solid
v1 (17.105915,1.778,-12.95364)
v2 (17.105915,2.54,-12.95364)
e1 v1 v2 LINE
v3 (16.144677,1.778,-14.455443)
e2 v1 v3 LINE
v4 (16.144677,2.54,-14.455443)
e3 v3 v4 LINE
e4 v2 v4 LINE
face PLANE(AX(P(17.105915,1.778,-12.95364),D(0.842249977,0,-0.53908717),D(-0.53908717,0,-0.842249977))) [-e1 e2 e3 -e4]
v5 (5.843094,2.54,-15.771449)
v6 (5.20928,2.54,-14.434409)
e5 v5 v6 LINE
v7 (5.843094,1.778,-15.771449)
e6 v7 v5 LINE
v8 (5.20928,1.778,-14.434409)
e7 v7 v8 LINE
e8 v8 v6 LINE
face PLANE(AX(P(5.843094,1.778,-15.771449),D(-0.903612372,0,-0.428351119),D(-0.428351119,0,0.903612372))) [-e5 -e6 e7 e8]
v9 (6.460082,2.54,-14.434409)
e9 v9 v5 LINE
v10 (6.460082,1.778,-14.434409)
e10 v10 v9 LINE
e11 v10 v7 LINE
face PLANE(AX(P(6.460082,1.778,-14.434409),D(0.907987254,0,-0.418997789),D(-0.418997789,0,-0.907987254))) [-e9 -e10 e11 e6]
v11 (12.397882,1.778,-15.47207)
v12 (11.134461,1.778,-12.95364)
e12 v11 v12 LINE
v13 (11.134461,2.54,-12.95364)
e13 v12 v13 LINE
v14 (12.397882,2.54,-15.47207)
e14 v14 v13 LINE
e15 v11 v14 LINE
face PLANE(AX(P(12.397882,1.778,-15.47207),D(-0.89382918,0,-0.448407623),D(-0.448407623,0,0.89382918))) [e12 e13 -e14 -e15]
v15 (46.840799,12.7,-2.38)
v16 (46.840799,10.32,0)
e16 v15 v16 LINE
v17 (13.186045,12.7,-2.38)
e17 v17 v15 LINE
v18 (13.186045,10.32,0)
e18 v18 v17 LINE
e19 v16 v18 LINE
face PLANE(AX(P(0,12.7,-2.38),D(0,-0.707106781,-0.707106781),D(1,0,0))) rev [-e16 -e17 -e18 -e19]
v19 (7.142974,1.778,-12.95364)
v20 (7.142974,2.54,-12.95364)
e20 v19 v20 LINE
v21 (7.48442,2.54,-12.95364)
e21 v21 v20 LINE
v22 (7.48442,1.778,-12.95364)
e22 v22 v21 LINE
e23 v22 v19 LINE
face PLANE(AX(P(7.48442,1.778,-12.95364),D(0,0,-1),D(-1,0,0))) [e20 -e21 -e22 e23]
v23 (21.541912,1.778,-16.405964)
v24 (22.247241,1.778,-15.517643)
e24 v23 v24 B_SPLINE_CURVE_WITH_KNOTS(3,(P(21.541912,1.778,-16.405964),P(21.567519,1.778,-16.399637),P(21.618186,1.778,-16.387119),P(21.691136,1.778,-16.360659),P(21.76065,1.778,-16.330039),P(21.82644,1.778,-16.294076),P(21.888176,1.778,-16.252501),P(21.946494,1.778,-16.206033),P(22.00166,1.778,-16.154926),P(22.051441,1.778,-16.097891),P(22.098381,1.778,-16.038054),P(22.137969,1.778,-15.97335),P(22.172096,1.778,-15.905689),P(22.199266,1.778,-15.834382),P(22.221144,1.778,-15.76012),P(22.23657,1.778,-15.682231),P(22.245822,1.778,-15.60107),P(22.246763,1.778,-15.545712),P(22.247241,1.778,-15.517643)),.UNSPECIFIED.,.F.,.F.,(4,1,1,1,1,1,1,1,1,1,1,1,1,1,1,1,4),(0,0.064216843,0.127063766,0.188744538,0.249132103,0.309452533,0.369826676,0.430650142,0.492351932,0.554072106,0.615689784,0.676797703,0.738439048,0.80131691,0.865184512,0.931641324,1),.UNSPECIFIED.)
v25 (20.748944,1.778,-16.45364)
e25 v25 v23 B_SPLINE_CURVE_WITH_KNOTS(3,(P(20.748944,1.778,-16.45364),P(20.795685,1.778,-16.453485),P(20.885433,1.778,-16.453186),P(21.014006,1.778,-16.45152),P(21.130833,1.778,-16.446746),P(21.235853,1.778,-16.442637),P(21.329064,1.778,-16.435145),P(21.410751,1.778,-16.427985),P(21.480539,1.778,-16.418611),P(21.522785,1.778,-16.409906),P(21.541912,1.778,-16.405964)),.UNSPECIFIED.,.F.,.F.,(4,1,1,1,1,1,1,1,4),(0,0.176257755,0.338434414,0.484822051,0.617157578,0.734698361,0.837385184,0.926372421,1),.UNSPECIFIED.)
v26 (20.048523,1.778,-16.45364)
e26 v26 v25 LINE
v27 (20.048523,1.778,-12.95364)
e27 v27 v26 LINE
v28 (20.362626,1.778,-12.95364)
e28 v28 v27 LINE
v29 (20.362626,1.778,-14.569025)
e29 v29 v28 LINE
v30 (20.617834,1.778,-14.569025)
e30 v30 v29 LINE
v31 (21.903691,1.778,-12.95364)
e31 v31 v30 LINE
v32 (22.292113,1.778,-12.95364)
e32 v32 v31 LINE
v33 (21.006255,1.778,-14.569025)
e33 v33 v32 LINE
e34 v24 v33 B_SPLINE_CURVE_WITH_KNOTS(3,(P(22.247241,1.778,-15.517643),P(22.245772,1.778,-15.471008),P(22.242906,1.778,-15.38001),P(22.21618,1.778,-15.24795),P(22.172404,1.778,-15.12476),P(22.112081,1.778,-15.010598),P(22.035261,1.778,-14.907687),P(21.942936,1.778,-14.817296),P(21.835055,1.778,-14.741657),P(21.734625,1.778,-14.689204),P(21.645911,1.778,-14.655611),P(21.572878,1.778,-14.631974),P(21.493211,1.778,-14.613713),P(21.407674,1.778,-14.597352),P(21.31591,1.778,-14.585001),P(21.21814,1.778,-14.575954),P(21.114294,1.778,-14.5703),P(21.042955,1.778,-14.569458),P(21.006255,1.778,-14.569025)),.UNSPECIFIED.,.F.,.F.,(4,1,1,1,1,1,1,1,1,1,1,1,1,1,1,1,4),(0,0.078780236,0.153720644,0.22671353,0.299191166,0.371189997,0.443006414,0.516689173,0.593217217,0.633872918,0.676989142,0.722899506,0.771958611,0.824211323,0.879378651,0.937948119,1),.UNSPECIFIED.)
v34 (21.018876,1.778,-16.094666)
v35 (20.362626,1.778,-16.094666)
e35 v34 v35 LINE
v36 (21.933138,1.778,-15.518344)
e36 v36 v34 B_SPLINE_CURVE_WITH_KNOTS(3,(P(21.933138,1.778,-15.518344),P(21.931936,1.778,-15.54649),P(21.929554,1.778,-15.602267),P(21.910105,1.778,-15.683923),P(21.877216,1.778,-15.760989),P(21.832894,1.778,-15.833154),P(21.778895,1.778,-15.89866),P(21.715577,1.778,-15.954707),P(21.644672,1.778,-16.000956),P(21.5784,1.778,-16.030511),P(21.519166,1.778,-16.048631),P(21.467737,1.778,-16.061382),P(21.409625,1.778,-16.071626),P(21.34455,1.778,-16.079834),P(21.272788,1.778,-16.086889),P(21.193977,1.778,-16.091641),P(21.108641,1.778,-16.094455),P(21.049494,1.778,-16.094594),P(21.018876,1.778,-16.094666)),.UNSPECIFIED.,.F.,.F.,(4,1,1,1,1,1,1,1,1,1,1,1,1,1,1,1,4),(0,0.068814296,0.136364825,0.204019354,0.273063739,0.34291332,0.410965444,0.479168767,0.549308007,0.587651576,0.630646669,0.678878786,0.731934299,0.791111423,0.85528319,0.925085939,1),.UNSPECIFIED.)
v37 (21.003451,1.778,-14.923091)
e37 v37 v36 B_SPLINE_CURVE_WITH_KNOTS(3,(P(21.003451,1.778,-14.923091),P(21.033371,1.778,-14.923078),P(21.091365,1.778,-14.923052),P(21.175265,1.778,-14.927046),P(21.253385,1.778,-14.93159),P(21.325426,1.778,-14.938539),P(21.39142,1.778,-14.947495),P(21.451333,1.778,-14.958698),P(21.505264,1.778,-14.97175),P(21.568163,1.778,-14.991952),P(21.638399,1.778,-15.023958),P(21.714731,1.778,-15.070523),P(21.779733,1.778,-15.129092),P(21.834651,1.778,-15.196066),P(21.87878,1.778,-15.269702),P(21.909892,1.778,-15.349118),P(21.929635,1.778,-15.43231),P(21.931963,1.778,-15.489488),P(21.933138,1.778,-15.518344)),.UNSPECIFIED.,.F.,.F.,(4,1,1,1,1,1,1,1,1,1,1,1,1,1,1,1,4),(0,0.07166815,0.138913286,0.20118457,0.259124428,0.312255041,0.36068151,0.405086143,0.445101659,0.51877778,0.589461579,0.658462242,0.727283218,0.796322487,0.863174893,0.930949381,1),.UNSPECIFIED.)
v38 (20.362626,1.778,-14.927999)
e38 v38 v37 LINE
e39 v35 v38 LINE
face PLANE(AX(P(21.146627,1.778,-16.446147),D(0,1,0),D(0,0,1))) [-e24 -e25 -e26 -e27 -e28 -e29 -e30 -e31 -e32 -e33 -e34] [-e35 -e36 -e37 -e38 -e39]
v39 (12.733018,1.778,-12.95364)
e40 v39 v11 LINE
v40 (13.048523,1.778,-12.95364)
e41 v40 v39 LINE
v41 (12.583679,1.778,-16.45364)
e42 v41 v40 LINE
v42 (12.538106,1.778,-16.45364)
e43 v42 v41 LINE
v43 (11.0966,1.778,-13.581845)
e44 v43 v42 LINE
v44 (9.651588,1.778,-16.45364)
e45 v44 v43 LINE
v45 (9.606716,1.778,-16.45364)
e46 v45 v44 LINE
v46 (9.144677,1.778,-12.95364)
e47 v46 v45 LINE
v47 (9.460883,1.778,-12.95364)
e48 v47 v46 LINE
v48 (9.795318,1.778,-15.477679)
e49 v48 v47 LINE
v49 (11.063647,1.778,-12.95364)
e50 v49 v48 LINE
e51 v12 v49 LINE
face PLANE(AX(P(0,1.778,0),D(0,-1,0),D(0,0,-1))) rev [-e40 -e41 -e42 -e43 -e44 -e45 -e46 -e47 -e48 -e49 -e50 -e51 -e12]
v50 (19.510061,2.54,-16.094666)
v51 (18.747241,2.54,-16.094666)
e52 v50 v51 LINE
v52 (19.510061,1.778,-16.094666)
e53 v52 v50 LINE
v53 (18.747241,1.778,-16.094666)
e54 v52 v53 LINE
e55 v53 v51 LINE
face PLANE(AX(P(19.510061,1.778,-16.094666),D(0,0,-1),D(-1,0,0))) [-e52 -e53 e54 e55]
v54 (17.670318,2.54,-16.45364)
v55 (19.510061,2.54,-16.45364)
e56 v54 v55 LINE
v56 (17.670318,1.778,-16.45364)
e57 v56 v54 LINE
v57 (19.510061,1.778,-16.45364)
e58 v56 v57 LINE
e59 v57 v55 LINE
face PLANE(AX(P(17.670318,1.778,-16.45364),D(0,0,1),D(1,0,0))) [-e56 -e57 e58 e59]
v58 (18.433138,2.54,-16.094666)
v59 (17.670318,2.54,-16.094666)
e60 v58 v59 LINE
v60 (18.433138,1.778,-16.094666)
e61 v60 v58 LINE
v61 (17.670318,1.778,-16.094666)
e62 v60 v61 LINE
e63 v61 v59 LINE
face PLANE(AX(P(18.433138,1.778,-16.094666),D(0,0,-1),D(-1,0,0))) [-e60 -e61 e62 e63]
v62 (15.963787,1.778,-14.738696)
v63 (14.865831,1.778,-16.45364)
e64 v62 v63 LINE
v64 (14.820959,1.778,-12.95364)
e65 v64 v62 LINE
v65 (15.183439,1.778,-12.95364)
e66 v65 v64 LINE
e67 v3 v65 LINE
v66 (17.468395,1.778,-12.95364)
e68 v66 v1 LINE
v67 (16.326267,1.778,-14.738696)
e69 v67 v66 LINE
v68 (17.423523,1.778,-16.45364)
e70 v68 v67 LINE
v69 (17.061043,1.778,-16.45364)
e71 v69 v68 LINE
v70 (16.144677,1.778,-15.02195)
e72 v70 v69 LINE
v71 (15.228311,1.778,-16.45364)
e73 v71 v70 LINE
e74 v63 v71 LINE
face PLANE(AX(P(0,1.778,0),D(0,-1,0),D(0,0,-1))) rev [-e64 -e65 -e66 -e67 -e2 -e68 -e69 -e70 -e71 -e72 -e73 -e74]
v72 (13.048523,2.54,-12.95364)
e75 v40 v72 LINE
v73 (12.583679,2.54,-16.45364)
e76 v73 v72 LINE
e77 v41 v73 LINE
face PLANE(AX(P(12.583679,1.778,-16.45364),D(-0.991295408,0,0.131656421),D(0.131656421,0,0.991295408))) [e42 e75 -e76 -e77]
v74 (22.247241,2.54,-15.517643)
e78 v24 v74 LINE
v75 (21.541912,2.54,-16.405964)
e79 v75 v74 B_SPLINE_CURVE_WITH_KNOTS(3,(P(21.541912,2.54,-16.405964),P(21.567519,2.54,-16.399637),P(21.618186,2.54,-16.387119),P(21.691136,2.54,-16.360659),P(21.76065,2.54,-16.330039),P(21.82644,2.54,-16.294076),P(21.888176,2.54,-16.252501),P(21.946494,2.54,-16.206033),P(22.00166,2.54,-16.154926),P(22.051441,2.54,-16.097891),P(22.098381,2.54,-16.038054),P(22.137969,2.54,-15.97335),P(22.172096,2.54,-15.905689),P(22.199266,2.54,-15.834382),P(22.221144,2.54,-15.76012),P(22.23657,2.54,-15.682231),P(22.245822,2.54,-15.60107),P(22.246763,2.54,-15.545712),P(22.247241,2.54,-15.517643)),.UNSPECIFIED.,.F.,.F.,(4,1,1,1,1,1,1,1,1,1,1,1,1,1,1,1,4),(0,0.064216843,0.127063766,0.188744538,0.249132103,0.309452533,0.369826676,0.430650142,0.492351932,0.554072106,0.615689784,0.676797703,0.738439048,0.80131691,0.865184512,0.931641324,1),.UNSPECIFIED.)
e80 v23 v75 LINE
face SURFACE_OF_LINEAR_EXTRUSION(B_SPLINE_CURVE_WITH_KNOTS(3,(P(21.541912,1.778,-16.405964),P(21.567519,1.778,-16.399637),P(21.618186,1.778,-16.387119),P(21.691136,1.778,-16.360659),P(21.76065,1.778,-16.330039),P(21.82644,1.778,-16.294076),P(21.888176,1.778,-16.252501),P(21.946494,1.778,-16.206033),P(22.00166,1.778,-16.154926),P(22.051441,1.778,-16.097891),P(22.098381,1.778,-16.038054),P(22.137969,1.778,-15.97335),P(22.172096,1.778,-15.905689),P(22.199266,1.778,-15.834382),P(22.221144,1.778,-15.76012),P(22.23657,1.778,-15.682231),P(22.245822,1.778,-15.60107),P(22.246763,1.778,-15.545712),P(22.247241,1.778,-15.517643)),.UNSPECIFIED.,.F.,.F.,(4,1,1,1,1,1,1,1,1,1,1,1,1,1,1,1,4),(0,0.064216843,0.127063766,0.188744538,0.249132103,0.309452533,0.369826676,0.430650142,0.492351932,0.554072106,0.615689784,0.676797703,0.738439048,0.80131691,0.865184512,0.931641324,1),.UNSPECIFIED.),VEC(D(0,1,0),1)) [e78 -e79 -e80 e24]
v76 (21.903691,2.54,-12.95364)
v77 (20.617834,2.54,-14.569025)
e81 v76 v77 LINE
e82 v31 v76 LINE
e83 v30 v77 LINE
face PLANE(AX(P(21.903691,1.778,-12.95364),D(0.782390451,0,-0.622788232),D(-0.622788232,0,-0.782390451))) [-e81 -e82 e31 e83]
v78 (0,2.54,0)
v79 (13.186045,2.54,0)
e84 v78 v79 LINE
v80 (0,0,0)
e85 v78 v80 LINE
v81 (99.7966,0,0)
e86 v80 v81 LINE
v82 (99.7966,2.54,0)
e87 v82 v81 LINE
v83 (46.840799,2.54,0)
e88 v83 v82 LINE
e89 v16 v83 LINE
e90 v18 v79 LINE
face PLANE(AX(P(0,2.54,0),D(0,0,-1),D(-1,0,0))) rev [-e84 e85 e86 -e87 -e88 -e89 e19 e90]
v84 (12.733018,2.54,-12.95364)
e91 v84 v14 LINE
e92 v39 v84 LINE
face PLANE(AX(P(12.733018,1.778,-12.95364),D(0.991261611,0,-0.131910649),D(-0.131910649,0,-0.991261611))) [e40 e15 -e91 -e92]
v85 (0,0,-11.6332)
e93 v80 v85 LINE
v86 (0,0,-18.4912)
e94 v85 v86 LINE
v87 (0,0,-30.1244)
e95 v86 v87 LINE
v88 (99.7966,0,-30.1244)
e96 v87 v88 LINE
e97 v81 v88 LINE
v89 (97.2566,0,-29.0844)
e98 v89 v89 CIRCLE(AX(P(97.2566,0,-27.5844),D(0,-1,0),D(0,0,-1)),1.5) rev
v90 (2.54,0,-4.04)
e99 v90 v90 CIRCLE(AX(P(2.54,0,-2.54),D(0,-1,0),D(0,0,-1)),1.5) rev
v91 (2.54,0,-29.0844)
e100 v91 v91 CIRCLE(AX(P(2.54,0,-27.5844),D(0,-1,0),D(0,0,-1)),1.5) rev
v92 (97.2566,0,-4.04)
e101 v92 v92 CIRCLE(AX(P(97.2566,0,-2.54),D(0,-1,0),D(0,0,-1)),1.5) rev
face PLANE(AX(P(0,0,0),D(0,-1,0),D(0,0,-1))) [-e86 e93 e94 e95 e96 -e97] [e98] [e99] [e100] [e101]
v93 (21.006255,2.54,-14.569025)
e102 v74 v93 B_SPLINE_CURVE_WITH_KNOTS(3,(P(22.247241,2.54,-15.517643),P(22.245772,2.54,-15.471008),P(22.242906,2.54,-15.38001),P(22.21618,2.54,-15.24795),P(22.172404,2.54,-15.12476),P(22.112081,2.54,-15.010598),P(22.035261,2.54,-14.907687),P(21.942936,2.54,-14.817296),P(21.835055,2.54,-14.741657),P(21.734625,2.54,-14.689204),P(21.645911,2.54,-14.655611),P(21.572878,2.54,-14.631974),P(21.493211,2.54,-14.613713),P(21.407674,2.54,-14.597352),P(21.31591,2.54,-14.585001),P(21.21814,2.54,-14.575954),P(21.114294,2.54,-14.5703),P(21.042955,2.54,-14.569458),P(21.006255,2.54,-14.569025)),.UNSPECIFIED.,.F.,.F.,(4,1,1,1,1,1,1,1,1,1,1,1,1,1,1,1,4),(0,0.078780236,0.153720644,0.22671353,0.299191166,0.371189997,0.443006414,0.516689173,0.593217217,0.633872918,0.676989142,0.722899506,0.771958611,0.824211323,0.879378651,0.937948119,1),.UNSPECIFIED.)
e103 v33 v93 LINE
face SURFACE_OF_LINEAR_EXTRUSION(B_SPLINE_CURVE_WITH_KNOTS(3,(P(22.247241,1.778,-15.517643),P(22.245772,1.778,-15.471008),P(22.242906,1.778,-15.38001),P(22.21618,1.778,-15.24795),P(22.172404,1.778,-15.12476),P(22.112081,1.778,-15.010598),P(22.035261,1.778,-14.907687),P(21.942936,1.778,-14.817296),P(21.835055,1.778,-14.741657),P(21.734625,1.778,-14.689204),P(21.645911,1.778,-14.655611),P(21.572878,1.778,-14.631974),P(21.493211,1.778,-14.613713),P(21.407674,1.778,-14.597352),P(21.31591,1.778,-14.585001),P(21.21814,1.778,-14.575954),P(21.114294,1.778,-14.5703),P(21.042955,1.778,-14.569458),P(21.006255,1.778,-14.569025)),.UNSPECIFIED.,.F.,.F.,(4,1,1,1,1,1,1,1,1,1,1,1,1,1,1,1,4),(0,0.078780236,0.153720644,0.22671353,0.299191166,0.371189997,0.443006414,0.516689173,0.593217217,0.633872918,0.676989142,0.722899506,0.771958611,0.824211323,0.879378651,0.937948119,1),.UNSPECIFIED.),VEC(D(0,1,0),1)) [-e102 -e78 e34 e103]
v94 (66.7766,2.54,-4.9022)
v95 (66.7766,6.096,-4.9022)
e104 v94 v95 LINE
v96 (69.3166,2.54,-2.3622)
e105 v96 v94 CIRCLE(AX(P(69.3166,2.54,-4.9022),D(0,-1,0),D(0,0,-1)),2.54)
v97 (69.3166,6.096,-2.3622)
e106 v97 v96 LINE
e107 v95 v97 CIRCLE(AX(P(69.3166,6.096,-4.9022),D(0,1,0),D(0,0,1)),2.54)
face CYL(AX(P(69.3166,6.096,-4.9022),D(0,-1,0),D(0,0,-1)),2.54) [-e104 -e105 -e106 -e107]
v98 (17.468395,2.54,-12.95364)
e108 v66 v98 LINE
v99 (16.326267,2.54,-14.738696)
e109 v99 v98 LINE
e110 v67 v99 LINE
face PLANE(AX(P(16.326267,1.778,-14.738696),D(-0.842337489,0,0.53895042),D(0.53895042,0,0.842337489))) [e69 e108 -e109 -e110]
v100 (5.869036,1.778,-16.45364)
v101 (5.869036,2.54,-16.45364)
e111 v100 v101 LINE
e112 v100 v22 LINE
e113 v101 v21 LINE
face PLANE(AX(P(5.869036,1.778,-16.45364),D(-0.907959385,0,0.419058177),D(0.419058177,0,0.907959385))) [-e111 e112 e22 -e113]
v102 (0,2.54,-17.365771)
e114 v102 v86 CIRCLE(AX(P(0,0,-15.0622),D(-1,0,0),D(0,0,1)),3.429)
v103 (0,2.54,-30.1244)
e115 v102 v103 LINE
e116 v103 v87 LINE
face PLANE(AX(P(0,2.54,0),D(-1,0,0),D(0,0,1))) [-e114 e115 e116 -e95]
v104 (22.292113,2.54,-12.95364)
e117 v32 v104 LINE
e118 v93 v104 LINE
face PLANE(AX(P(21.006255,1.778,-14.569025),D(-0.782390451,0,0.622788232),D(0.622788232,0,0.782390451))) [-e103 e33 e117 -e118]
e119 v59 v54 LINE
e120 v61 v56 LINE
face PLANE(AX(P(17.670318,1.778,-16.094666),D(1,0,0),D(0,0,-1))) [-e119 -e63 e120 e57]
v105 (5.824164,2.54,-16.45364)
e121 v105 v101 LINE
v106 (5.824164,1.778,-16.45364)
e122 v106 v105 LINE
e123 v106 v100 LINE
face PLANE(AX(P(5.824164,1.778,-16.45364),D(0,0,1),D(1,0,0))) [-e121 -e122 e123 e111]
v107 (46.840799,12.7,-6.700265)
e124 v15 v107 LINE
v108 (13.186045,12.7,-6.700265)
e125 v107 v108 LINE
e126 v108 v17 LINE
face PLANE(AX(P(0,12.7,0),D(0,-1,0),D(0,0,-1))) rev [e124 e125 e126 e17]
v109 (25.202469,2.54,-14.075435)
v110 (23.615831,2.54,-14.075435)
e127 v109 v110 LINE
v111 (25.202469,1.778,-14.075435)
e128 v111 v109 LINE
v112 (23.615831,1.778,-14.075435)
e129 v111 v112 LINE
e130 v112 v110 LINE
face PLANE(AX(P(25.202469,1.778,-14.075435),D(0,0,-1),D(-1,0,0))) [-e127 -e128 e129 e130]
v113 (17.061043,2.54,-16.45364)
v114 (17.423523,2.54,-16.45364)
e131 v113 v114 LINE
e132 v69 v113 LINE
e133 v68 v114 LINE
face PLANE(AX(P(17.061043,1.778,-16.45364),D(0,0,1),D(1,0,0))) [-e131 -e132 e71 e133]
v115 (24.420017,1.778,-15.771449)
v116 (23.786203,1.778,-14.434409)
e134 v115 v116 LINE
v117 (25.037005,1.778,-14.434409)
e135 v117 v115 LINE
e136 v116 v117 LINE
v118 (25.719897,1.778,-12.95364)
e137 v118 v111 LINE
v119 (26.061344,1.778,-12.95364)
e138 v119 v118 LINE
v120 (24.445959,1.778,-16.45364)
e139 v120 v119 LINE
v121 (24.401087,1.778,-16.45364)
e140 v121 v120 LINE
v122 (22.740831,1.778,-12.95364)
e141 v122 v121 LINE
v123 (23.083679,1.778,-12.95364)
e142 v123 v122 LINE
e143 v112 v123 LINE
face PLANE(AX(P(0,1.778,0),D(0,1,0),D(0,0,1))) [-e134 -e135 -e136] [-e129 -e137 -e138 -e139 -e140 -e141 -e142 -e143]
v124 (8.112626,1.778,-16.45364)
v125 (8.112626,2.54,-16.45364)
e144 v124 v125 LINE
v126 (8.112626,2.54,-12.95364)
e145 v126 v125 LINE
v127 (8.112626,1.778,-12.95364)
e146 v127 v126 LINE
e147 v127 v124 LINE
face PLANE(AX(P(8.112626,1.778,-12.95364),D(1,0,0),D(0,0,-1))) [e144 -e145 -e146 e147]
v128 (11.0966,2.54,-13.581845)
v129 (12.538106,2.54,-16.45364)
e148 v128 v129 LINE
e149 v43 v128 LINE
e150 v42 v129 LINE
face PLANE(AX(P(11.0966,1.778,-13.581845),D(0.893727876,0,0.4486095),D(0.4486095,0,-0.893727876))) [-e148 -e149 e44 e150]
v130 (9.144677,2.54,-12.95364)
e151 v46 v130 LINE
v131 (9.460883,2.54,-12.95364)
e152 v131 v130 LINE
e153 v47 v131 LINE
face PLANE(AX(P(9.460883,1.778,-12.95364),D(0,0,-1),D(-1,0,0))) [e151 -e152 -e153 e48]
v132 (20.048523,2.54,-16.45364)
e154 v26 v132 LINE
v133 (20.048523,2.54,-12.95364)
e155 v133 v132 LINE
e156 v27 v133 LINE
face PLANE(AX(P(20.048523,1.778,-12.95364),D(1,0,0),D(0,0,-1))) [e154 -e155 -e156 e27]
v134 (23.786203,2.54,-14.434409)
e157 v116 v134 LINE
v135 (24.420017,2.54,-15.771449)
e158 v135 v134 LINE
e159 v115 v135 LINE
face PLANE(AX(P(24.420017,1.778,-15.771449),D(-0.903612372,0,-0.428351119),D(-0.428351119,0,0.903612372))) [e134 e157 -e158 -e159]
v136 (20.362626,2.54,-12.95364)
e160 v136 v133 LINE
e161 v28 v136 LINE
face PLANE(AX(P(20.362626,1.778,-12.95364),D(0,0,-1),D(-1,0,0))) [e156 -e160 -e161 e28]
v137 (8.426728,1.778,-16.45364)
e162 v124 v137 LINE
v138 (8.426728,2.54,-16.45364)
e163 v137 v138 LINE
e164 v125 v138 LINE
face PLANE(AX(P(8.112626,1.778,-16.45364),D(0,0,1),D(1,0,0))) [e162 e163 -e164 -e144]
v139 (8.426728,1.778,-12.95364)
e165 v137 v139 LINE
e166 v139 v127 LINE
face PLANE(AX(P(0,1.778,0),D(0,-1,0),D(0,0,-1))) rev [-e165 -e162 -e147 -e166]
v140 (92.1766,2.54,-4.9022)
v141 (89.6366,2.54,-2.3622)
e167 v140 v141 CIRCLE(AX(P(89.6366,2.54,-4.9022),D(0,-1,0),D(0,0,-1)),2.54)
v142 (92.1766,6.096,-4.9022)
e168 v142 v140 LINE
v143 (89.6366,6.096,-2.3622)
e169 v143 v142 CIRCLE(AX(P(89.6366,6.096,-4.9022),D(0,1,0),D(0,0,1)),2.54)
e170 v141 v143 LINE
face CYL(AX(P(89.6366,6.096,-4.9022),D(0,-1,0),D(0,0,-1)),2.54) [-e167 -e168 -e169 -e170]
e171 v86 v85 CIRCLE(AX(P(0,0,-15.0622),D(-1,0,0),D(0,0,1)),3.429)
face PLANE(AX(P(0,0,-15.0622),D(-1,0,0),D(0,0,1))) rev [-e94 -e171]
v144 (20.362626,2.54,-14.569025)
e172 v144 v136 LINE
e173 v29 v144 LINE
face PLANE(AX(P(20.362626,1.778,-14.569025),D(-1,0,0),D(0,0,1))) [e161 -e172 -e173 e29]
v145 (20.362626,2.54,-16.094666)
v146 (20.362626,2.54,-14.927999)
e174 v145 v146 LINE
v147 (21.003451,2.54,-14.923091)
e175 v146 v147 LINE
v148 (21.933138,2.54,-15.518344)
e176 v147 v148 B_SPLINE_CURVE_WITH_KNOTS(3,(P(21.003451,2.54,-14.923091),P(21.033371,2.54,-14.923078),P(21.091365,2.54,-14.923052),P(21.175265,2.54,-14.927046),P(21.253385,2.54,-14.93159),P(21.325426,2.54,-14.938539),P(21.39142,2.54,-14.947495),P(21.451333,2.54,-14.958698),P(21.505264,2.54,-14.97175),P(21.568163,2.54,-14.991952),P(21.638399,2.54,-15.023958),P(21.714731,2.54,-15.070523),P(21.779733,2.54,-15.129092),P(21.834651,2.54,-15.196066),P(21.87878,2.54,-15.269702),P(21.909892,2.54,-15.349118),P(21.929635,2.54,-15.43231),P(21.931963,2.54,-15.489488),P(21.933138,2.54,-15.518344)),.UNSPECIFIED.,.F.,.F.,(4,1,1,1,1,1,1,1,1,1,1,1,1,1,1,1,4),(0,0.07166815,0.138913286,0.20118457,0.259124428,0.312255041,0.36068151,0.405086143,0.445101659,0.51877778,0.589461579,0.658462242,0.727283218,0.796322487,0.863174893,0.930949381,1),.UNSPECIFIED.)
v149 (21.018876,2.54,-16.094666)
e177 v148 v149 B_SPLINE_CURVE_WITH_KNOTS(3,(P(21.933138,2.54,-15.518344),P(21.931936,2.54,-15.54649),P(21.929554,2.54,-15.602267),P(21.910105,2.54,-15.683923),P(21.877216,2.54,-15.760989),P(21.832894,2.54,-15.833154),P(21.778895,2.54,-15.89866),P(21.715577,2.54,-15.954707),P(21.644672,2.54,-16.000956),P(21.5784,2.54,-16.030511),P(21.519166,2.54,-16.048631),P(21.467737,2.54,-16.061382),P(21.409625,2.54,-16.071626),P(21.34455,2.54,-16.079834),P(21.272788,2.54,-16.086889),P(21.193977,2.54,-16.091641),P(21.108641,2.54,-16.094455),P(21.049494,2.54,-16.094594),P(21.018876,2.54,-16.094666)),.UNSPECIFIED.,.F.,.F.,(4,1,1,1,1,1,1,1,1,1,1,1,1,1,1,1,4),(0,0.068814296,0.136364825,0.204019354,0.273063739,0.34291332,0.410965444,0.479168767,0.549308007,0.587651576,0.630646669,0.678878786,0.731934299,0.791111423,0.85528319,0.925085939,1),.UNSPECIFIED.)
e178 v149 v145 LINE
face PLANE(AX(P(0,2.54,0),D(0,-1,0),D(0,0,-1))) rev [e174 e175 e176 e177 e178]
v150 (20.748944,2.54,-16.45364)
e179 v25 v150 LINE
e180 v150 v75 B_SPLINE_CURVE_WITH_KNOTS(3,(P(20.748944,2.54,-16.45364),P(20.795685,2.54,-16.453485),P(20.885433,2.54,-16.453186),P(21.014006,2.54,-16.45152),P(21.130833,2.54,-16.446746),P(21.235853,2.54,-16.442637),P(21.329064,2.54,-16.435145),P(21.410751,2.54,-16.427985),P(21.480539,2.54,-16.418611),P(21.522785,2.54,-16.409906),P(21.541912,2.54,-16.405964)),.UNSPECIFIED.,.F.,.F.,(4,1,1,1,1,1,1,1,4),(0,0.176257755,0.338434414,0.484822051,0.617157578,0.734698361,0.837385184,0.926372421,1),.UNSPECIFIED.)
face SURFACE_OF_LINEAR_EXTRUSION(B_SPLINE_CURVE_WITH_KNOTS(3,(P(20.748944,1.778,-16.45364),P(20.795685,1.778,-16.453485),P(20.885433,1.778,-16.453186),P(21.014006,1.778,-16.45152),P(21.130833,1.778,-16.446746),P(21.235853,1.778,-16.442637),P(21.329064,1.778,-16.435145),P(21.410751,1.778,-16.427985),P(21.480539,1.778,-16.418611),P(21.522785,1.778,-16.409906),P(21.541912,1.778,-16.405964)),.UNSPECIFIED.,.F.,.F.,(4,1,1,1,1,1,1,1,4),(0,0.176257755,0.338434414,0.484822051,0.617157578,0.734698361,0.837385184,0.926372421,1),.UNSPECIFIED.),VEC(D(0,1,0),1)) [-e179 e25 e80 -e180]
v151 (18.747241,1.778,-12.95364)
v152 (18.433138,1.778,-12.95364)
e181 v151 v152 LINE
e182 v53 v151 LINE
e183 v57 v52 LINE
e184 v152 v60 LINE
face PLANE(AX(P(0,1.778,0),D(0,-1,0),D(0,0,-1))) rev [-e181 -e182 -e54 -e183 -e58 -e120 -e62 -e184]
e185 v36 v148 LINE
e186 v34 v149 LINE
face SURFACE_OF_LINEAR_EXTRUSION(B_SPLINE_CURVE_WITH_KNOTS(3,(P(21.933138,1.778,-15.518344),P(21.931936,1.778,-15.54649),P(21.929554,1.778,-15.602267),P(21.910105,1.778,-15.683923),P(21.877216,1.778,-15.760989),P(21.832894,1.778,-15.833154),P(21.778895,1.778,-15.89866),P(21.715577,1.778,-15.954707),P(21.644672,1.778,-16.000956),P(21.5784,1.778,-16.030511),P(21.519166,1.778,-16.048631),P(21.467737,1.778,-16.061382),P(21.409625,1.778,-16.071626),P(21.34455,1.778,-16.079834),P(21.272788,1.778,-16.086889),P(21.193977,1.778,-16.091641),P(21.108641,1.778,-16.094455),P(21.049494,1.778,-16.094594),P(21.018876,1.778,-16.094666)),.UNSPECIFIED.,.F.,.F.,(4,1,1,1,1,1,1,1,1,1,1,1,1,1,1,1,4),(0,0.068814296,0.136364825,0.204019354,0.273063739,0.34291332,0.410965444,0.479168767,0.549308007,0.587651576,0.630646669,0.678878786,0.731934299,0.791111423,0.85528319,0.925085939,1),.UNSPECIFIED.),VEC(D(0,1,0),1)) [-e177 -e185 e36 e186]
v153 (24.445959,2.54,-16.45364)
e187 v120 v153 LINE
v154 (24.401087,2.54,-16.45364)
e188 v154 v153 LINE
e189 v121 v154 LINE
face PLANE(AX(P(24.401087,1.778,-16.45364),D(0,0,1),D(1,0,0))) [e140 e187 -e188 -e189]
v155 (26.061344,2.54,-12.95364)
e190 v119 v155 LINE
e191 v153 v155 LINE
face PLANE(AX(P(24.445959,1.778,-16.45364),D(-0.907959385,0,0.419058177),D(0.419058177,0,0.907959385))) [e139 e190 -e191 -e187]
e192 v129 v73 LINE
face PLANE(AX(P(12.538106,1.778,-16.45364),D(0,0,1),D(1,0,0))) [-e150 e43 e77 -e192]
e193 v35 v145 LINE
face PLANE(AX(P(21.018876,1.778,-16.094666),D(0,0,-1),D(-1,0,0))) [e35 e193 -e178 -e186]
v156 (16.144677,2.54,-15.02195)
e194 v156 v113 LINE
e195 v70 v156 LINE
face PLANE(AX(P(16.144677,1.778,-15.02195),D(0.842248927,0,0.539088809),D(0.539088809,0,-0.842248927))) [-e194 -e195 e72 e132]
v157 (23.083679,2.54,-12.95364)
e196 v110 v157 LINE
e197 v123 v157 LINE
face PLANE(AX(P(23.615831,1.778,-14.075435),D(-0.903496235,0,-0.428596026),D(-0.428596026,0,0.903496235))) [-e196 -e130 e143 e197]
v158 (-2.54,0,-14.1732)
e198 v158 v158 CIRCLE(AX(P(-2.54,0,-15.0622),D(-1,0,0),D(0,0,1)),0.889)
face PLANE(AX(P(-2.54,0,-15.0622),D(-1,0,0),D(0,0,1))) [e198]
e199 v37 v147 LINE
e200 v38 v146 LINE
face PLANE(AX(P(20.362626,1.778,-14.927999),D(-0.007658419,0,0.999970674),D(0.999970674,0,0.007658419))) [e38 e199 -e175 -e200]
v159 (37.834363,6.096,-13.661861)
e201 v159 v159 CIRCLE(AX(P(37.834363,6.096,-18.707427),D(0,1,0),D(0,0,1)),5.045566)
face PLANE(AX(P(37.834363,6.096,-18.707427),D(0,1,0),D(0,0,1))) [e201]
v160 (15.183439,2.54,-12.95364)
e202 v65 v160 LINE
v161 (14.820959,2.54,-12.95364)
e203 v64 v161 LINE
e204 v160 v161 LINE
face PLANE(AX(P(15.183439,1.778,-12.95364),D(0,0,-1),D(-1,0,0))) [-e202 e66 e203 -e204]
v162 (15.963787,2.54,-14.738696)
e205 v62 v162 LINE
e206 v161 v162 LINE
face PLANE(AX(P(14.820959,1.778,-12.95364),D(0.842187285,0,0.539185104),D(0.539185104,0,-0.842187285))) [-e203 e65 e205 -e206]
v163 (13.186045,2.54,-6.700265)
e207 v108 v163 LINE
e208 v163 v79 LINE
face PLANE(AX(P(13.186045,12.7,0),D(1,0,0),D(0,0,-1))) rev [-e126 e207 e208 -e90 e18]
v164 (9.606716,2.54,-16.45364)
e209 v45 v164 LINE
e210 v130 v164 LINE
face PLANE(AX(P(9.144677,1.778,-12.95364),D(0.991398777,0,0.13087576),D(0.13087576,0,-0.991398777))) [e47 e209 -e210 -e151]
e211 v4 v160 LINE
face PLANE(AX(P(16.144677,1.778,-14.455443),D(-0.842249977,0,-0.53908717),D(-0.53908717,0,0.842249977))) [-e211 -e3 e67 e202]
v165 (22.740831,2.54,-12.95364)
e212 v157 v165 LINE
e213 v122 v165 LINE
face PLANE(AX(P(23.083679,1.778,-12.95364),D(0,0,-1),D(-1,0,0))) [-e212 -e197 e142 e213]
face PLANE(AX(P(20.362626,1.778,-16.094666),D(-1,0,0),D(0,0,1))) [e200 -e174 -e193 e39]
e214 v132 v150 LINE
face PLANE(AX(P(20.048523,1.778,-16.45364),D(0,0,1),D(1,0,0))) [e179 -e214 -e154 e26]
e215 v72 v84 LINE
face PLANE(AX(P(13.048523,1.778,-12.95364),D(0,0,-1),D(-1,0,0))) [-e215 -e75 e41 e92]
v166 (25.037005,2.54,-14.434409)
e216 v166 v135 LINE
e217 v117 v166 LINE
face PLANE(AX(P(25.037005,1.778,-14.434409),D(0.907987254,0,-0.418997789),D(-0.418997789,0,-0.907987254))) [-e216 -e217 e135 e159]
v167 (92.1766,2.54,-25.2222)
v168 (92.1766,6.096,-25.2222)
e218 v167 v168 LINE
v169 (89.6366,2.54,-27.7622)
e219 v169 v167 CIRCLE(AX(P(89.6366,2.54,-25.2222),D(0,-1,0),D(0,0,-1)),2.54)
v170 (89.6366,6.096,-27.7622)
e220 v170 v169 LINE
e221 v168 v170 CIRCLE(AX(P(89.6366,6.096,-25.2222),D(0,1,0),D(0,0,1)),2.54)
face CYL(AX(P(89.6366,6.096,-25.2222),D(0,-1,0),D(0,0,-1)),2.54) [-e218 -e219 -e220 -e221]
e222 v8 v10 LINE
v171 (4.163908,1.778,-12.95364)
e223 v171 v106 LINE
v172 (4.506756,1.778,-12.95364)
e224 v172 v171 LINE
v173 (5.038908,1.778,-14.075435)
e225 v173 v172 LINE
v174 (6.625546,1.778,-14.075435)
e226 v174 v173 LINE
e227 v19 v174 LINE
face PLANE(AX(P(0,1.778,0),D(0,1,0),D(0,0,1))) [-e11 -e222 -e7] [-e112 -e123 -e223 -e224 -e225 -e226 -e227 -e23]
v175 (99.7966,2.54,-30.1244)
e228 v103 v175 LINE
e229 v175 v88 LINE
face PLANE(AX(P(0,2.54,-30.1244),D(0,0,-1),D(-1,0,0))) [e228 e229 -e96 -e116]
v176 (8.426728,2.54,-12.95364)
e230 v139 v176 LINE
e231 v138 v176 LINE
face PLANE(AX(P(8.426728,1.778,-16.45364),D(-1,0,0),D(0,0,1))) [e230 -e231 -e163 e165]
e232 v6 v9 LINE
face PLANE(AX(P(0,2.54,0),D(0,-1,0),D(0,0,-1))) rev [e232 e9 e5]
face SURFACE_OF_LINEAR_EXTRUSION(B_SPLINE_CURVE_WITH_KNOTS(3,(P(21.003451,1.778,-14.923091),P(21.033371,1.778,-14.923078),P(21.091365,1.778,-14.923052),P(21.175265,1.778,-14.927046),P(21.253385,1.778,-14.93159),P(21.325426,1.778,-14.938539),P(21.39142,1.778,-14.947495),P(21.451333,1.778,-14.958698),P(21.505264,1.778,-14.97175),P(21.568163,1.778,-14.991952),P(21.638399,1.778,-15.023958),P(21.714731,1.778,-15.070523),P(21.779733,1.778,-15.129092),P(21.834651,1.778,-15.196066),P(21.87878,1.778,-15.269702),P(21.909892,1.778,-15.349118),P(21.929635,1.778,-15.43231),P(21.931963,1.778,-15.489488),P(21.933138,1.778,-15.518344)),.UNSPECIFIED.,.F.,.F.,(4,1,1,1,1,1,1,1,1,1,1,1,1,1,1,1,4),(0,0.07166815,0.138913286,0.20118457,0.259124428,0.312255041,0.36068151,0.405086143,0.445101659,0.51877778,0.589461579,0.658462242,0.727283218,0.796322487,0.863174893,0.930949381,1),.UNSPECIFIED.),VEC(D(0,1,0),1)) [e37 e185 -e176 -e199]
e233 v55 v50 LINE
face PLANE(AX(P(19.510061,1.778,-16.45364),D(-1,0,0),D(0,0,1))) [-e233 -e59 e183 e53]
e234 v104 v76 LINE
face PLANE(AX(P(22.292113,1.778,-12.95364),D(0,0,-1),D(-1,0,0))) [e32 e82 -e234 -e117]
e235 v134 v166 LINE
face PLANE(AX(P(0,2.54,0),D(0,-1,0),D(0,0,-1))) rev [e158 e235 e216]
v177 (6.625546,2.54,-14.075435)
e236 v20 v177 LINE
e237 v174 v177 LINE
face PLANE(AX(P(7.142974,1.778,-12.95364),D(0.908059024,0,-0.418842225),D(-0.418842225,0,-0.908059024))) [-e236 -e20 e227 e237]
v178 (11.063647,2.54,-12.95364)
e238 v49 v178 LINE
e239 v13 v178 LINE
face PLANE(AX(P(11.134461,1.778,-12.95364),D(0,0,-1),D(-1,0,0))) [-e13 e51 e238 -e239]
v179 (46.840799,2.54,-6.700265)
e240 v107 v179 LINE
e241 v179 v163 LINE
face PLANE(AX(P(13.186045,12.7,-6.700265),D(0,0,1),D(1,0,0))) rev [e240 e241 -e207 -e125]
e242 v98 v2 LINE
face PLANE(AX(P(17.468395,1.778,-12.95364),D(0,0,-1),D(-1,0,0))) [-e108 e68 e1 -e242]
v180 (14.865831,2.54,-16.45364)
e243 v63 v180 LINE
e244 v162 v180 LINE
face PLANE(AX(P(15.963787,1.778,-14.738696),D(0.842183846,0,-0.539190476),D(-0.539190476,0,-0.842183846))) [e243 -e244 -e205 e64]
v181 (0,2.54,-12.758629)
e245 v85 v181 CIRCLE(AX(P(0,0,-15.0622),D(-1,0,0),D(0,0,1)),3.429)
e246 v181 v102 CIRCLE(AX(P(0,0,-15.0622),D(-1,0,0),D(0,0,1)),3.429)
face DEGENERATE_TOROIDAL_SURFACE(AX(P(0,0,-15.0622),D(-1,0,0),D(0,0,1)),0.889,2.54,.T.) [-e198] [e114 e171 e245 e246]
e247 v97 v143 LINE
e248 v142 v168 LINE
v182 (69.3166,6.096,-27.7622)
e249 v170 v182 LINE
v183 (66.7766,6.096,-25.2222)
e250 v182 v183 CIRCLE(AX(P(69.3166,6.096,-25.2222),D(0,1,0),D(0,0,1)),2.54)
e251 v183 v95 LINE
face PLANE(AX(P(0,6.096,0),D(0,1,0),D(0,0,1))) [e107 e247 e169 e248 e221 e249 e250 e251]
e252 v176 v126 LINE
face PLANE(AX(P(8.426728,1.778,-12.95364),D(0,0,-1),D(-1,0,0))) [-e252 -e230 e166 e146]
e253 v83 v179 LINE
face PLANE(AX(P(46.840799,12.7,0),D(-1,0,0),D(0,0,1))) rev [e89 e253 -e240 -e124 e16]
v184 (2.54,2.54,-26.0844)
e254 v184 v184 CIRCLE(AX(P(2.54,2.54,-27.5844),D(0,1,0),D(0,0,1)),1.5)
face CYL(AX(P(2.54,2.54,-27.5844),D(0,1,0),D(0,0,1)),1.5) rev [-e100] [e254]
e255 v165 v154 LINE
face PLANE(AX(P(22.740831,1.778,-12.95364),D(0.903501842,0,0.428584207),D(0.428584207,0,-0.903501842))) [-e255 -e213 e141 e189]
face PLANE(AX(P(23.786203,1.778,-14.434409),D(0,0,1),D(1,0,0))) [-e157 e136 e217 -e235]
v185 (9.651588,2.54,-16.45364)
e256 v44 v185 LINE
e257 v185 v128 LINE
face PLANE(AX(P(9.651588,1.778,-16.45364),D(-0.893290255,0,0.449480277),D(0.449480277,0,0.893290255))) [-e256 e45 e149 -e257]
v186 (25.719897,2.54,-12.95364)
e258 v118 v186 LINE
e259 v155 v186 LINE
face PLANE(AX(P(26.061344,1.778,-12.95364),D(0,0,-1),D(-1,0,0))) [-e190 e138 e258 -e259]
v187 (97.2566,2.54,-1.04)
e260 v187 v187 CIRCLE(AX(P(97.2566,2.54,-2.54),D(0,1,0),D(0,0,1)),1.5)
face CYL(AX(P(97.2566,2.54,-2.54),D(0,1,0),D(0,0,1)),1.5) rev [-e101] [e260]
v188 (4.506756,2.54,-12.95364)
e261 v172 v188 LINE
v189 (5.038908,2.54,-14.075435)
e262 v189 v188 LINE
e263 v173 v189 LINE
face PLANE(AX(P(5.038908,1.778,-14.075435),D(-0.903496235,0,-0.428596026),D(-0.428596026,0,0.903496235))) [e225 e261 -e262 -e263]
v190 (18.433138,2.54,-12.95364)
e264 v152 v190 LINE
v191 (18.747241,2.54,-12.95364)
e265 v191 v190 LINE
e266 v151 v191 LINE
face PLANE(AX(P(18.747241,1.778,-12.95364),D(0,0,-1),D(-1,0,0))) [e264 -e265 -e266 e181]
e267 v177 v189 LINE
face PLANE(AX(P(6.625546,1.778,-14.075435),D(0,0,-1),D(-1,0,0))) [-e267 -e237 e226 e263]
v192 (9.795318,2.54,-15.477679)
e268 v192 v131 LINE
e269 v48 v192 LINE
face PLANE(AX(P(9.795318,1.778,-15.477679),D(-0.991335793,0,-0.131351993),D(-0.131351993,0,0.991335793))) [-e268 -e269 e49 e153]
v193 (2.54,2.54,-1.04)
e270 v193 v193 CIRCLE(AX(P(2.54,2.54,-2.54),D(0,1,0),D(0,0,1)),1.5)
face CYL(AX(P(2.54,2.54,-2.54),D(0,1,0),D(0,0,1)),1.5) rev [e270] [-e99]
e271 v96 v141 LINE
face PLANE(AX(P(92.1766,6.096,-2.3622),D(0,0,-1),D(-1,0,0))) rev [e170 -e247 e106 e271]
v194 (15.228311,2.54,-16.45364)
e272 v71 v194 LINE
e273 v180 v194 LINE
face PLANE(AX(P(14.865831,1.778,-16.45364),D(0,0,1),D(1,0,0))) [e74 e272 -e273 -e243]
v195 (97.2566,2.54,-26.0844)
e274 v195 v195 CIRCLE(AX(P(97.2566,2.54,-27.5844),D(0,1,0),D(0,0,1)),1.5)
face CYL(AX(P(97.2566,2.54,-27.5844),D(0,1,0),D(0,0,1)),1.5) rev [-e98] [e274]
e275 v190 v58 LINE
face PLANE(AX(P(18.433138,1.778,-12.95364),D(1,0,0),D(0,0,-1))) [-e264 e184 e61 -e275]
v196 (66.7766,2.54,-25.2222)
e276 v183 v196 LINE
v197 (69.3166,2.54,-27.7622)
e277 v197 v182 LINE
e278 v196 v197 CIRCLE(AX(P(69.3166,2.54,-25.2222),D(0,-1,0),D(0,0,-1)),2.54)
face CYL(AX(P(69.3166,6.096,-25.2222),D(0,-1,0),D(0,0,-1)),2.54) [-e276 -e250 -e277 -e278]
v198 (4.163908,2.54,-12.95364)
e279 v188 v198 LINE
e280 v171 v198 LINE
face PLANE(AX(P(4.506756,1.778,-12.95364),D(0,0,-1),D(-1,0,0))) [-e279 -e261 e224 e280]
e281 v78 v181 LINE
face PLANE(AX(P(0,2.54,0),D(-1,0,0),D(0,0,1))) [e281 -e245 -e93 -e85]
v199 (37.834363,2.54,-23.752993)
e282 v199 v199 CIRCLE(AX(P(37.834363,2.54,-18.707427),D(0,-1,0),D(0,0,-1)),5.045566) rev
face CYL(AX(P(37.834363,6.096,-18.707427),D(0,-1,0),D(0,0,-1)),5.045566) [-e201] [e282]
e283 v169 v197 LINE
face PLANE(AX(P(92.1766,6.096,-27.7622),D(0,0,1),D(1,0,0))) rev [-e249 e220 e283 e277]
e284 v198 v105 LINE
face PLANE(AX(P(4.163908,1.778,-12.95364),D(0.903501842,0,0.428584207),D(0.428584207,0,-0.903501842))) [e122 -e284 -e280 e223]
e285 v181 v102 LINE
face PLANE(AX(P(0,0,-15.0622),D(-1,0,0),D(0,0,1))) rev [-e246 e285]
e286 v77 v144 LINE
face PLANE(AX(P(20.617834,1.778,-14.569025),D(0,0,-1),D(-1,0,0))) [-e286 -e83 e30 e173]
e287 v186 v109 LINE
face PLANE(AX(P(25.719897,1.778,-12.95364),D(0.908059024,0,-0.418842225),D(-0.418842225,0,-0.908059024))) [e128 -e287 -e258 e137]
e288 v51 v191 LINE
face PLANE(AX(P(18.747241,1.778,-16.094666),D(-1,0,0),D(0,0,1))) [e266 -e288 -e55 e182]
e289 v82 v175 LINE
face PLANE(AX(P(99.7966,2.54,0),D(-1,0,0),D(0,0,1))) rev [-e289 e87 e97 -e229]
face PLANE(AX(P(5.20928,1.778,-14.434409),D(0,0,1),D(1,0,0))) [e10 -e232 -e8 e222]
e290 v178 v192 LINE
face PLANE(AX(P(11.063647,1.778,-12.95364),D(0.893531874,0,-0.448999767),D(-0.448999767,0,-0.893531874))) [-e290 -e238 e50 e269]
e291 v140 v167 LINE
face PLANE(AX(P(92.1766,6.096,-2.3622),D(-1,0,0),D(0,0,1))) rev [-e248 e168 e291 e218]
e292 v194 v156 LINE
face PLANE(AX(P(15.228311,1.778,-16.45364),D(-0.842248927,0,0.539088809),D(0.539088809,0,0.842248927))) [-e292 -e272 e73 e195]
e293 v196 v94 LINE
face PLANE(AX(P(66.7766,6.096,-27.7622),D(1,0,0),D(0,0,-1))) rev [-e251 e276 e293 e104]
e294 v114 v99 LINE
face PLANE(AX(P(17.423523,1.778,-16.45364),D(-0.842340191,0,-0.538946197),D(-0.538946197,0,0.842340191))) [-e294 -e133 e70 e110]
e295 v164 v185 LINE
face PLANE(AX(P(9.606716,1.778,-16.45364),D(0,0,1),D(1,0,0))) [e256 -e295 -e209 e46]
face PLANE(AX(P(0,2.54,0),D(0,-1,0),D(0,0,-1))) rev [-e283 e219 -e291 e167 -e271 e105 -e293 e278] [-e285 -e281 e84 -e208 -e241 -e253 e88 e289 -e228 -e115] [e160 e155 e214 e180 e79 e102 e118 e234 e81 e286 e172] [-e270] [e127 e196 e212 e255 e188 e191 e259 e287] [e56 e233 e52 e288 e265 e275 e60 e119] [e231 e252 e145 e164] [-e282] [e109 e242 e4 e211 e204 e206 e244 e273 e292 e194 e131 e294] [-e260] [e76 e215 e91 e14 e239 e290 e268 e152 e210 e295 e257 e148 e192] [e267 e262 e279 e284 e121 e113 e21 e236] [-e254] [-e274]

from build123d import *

# Parameters (mm, degrees)
SKETCH1_W           = 99.7966
SKETCH1_H           = 30.1244
BOSS_EXTRUDE1_DEPTH = 2.54
SKETCH2_W           = 33.65475448
SKETCH2_H           = 6.70026545
BOSS_EXTRUDE2_DEPTH = 10.16
SKETCH3_R           = 5.045566178
SKETCH3_W           = 25.4
SKETCH3_H           = 25.4
BOSS_EXTRUDE3_DEPTH = 3.556
FILLET1_R           = 2.54
SKETCH4_R           = 3.429
BOSS_EXTRUDE4_DEPTH = 2.54
FILLET2_R           = 2.54
CHAMFER1_SIZE       = 2.38
SKETCH5_W           = 0.314102564
SKETCH5_H           = 3.5
CUT_EXTRUDE1_DEPTH  = 0.762


with BuildPart() as part:
    # Sketch1 → Boss-Extrude1 (new body)
    with BuildSketch(Plane(origin=(0, 0, 0), x_dir=(1, 0, 0), z_dir=(0, 1, 0))):
        with Locations((49.8983, 15.0622)):
            Rectangle(SKETCH1_W, SKETCH1_H)
    extrude(amount=BOSS_EXTRUDE1_DEPTH)

    # Sketch2 → Boss-Extrude2 (add)
    with BuildSketch(Plane(origin=(0, 2.54, 0), x_dir=(1, 0, 0), z_dir=(0, 1, 0))):
        with Locations((30.013421746, 3.350132725)):
            Rectangle(SKETCH2_W, SKETCH2_H)
    extrude(amount=BOSS_EXTRUDE2_DEPTH)

    # Sketch3 → Boss-Extrude3 (add)
    with BuildSketch(Plane(origin=(0, 2.54, 0), x_dir=(1, 0, 0), z_dir=(0, 1, 0))):
        with Locations(Location((37.834363192, 18.707427202, 0), (0, 0, 90))):
            Circle(SKETCH3_R)
        with Locations((79.4766, 15.0622)):
            Rectangle(SKETCH3_W, SKETCH3_H)
    extrude(amount=BOSS_EXTRUDE3_DEPTH)

    # Fillet1
    fillet1_edges = [part.edges().sort_by_distance(p)[0] for p in [
        (92.1766, 4.318, -27.7622),
        (66.7766, 4.318, -27.7622),
        (66.7766, 4.318, -2.3622),
        (92.1766, 4.318, -2.3622),
    ]]
    fillet(fillet1_edges, radius=FILLET1_R)

    # Sketch4 → Boss-Extrude4 (add)
    with BuildSketch(Plane.ZY):
        with Locations((-15.0622, 0)):
            Circle(SKETCH4_R)
    extrude(amount=BOSS_EXTRUDE4_DEPTH)

    # Fillet2
    fillet2_edges = [part.edges().sort_by_distance(p)[0] for p in [
        (-2.54, 0, -18.4912),
    ]]
    fillet(fillet2_edges, radius=FILLET2_R - 0.0001)  # a hair under: the kernel refuses the full size

    # Chamfer1
    chamfer1_edges = [part.edges().sort_by_distance(p)[0] for p in [
        (30.013421746, 12.7, 0),
    ]]
    chamfer(chamfer1_edges, length=CHAMFER1_SIZE)

    # Sketch5 → Cut-Extrude1 (cut)
    # profile 1 of 7: a face of its own
    with BuildSketch(Plane(origin=(0, 2.54, 0), x_dir=(1, 0, 0), z_dir=(0, 1, 0))):
        Polygon((5.86903585, 16.453640261), (7.484420465, 12.953640261), (7.142974151, 12.953640261), (6.625546267, 14.075435133), (5.038907645, 14.075435133), (4.506756203, 12.953640261), (4.163907645, 12.953640261), (5.824164055, 16.453640261), align=None)
        Polygon((5.843094344, 15.771448755), (5.209280241, 14.434409492), (6.460081523, 14.434409492), align=None, mode=Mode.SUBTRACT)
    # profile 2 of 7: a face of its own
    with BuildSketch(Plane(origin=(0, 2.54, 0), x_dir=(1, 0, 0), z_dir=(0, 1, 0))):
        with Locations((8.269676876, 14.703640261)):
            Rectangle(SKETCH5_W, SKETCH5_H)
    # profile 3 of 7: a face of its own
    with BuildSketch(Plane(origin=(0, 2.54, 0), x_dir=(1, 0, 0), z_dir=(0, 1, 0))):
        Polygon((9.144676876, 12.953640261), (9.606716138, 16.453640261), (9.651587933, 16.453640261), (11.096599953, 13.581845389), (12.538106363, 16.453640261), (12.58367928, 16.453640261), (13.04852303, 12.953640261), (12.733018222, 12.953640261), (12.397882004, 15.472069748), (11.13446053, 12.953640261), (11.063647228, 12.953640261), (9.795317901, 15.477678723), (9.460882805, 12.953640261), align=None)
    # profile 4 of 7: a face of its own
    with BuildSketch(Plane(origin=(0, 2.54, 0), x_dir=(1, 0, 0), z_dir=(0, 1, 0))):
        Polygon((14.865830722, 16.453640261), (15.22831069, 16.453640261), (16.144676876, 15.021949556), (17.061043062, 16.453640261), (17.42352303, 16.453640261), (16.326267421, 14.738696351), (17.468394824, 12.953640261), (17.105914856, 12.953640261), (16.144676876, 14.455443146), (15.183438895, 12.953640261), (14.820958927, 12.953640261), (15.963787453, 14.738696351), align=None)
    # profile 5 of 7: a face of its own
    with BuildSketch(Plane(origin=(0, 2.54, 0), x_dir=(1, 0, 0), z_dir=(0, 1, 0))):
        Polygon((17.670317901, 16.094665902), (17.670317901, 16.453640261), (19.510061491, 16.453640261), (19.510061491, 16.094665902), (18.747240978, 16.094665902), (18.747240978, 12.953640261), (18.433138414, 12.953640261), (18.433138414, 16.094665902), align=None)
    # profile 6 of 7: a face of its own
    with BuildSketch(Plane(origin=(0, 2.54, 0), x_dir=(1, 0, 0), z_dir=(0, 1, 0))):
        with BuildLine():
            Line((20.04852303, 16.453640261), (20.748943703, 16.453640261))
            add(Edge.make_bspline(
                [(20.748943703, 16.453640261), (20.795684831, 16.453484675), (20.885432976, 16.453185933), (21.014006246, 16.45152017), (21.130833343, 16.446745814), (21.235853182, 16.442637231), (21.329063837, 16.435145289), (21.410751128, 16.427984642), (21.480538825, 16.418610981), (21.522784677, 16.409905558), (21.541912453, 16.405963979)],
                knots=[0, 0, 0, 0, 1.410062039, 2.707475311, 3.878576406, 4.937260626, 5.877586885, 6.699081471, 7.410979367, 8, 8, 8, 8], degree=3))
            add(Edge.make_bspline(
                [(21.541912453, 16.405963979), (21.567519077, 16.399637214), (21.618186066, 16.38711865), (21.691136132, 16.360659049), (21.760650456, 16.330039425), (21.826440281, 16.294075704), (21.888176072, 16.252500925), (21.946494383, 16.206032802), (22.001659846, 16.154925596), (22.051441476, 16.097890755), (22.098380528, 16.038054245), (22.137969154, 15.973350488), (22.172095634, 15.905688961), (22.199266151, 15.834381543), (22.221144124, 15.760119771), (22.236570364, 15.682230974), (22.245821551, 15.601069999), (22.246763407, 15.545712091), (22.247240978, 15.517642665)],
                knots=[0, 0, 0, 0, 1.027469482, 2.033020251, 3.019912614, 3.986113645, 4.951240523, 5.91722682, 6.890402269, 7.87763091, 8.8651537, 9.85103654, 10.82876324, 11.815024772, 12.821070561, 13.842952187, 14.906261191, 16, 16, 16, 16], degree=3))
            add(Edge.make_bspline(
                [(22.247240978, 15.517642665), (22.24577198, 15.47100756), (22.242905584, 15.380010392), (22.216180481, 15.247949511), (22.172403961, 15.124760196), (22.112080672, 15.010597558), (22.035261196, 14.907686913), (21.942936405, 14.817296458), (21.835054794, 14.741656545), (21.734625478, 14.68920374), (21.645911278, 14.655610832), (21.572877965, 14.631974473), (21.493210988, 14.613712508), (21.407673653, 14.597352376), (21.315909998, 14.585000682), (21.218139958, 14.575954087), (21.114293807, 14.570300038), (21.042954737, 14.569458033), (21.006255401, 14.569024876)],
                knots=[0, 0, 0, 0, 1.260483769, 2.459530307, 3.627416485, 4.787058657, 5.939039949, 7.08810263, 8.267026773, 9.491475466, 10.141966685, 10.831826277, 11.566392101, 12.351337768, 13.187381173, 14.07005841, 15.007169909, 16, 16, 16, 16], degree=3))
            Line((21.006255401, 14.569024876), (22.292112773, 12.953640261))
            Line((22.292112773, 12.953640261), (21.903691299, 12.953640261))
            Line((21.903691299, 12.953640261), (20.617833927, 14.569024876))
            Line((20.617833927, 14.569024876), (20.362625594, 14.569024876))
            Line((20.362625594, 14.569024876), (20.362625594, 12.953640261))
            Line((20.362625594, 12.953640261), (20.04852303, 12.953640261))
            Line((20.04852303, 12.953640261), (20.04852303, 16.453640261))
        make_face()
        with BuildLine():
            Line((20.362625594, 16.094665902), (20.362625594, 14.927999235))
            Line((20.362625594, 14.927999235), (21.003450914, 14.923091383))
            add(Edge.make_bspline(
                [(21.003450914, 14.923091383), (21.033370953, 14.923078146), (21.09136451, 14.92305249), (21.175265175, 14.927046266), (21.253385287, 14.931589584), (21.325426039, 14.93853893), (21.391419614, 14.947495002), (21.451333027, 14.958697986), (21.505264079, 14.971750048), (21.568162618, 14.991951674), (21.638399149, 15.023957692), (21.714730609, 15.070523191), (21.779732947, 15.12909231), (21.834650809, 15.196065766), (21.87878024, 15.269702015), (21.909892295, 15.349118384), (21.929634737, 15.432309982), (21.931963283, 15.48948809), (21.933138414, 15.518343787)],
                knots=[0, 0, 0, 0, 1.146690395, 2.22261258, 3.21895312, 4.145990853, 4.996080663, 5.770904154, 6.481378293, 7.121626537, 8.300444488, 9.431385265, 10.535395872, 11.636531494, 12.74115979, 13.810798291, 14.895190096, 16, 16, 16, 16], degree=3))
            add(Edge.make_bspline(
                [(21.933138414, 15.518343787), (21.931936293, 15.54649036), (21.929554128, 15.602266599), (21.910105359, 15.683922509), (21.877215978, 15.76098946), (21.83289374, 15.833153945), (21.778894585, 15.89865968), (21.715576772, 15.954706833), (21.644671577, 16.000956298), (21.578400379, 16.030510679), (21.519166166, 16.048630532), (21.467736506, 16.061381696), (21.409625028, 16.071626165), (21.34454957, 16.079834225), (21.272787939, 16.08688917), (21.193977288, 16.091640948), (21.108640508, 16.094454812), (21.049493577, 16.094593901), (21.018875594, 16.094665902)],
                knots=[0, 0, 0, 0, 1.101028733, 2.181837193, 3.264309656, 4.369019818, 5.486613113, 6.575447106, 7.666700264, 8.788928104, 9.402425223, 10.0903467, 10.862060571, 11.710948788, 12.657782767, 13.684531032, 14.801375019, 16, 16, 16, 16], degree=3))
            Line((21.018875594, 16.094665902), (20.362625594, 16.094665902))
        make_face(mode=Mode.SUBTRACT)
    # profile 7 of 7: a face of its own
    with BuildSketch(Plane(origin=(0, 2.54, 0), x_dir=(1, 0, 0), z_dir=(0, 1, 0))):
        Polygon((24.445958927, 16.453640261), (26.061343542, 12.953640261), (25.719897228, 12.953640261), (25.202469344, 14.075435133), (23.615830722, 14.075435133), (23.08367928, 12.953640261), (22.740830722, 12.953640261), (24.401087132, 16.453640261), align=None)
        Polygon((24.420017421, 15.771448755), (23.786203318, 14.434409492), (25.0370046, 14.434409492), align=None, mode=Mode.SUBTRACT)
    extrude(amount=-CUT_EXTRUDE1_DEPTH, mode=Mode.SUBTRACT)

    # Sketch9 → Ø1.5mm Dowel Hole1 (revolve, cut)
    with BuildSketch(Plane(origin=(97.2566, 2.54, -2.54), x_dir=(0, 0, 1), z_dir=(1, 0, 0))):
        Polygon((0, 0), (0, 3.441290929), (1.5, 2.54), (1.5, 0), align=None)
    f_1_5mm_dowel_hole1 = revolve(axis=Axis((97.2566, 8.89, -2.54), (0, -1, 0)), mode=Mode.SUBTRACT)

    # Mirror1: Ø1.5mm Dowel Hole1 across plane
    add(f_1_5mm_dowel_hole1.mirror(Plane.XY.offset(-15.0622)), mode=Mode.SUBTRACT)

    # Mirror2: Ø1.5mm Dowel Hole1 across plane
    add(f_1_5mm_dowel_hole1.mirror(Plane.ZY.offset(-49.8983)), mode=Mode.SUBTRACT)

    # Mirror2 copy 1 sketch → Mirror2 copy 1 (revolve, cut)
    with BuildSketch(Plane(origin=(2.54, 2.54, -27.5844), x_dir=(0, 0, -1), z_dir=(-1, 0, 0))):
        Polygon((0, 0), (0, 3.441290929), (1.5, 2.54), (1.5, 0), align=None)
    revolve(axis=Axis((2.54, 8.89, -27.5844), (0, -1, 0)), mode=Mode.SUBTRACT)


solid = part.part
